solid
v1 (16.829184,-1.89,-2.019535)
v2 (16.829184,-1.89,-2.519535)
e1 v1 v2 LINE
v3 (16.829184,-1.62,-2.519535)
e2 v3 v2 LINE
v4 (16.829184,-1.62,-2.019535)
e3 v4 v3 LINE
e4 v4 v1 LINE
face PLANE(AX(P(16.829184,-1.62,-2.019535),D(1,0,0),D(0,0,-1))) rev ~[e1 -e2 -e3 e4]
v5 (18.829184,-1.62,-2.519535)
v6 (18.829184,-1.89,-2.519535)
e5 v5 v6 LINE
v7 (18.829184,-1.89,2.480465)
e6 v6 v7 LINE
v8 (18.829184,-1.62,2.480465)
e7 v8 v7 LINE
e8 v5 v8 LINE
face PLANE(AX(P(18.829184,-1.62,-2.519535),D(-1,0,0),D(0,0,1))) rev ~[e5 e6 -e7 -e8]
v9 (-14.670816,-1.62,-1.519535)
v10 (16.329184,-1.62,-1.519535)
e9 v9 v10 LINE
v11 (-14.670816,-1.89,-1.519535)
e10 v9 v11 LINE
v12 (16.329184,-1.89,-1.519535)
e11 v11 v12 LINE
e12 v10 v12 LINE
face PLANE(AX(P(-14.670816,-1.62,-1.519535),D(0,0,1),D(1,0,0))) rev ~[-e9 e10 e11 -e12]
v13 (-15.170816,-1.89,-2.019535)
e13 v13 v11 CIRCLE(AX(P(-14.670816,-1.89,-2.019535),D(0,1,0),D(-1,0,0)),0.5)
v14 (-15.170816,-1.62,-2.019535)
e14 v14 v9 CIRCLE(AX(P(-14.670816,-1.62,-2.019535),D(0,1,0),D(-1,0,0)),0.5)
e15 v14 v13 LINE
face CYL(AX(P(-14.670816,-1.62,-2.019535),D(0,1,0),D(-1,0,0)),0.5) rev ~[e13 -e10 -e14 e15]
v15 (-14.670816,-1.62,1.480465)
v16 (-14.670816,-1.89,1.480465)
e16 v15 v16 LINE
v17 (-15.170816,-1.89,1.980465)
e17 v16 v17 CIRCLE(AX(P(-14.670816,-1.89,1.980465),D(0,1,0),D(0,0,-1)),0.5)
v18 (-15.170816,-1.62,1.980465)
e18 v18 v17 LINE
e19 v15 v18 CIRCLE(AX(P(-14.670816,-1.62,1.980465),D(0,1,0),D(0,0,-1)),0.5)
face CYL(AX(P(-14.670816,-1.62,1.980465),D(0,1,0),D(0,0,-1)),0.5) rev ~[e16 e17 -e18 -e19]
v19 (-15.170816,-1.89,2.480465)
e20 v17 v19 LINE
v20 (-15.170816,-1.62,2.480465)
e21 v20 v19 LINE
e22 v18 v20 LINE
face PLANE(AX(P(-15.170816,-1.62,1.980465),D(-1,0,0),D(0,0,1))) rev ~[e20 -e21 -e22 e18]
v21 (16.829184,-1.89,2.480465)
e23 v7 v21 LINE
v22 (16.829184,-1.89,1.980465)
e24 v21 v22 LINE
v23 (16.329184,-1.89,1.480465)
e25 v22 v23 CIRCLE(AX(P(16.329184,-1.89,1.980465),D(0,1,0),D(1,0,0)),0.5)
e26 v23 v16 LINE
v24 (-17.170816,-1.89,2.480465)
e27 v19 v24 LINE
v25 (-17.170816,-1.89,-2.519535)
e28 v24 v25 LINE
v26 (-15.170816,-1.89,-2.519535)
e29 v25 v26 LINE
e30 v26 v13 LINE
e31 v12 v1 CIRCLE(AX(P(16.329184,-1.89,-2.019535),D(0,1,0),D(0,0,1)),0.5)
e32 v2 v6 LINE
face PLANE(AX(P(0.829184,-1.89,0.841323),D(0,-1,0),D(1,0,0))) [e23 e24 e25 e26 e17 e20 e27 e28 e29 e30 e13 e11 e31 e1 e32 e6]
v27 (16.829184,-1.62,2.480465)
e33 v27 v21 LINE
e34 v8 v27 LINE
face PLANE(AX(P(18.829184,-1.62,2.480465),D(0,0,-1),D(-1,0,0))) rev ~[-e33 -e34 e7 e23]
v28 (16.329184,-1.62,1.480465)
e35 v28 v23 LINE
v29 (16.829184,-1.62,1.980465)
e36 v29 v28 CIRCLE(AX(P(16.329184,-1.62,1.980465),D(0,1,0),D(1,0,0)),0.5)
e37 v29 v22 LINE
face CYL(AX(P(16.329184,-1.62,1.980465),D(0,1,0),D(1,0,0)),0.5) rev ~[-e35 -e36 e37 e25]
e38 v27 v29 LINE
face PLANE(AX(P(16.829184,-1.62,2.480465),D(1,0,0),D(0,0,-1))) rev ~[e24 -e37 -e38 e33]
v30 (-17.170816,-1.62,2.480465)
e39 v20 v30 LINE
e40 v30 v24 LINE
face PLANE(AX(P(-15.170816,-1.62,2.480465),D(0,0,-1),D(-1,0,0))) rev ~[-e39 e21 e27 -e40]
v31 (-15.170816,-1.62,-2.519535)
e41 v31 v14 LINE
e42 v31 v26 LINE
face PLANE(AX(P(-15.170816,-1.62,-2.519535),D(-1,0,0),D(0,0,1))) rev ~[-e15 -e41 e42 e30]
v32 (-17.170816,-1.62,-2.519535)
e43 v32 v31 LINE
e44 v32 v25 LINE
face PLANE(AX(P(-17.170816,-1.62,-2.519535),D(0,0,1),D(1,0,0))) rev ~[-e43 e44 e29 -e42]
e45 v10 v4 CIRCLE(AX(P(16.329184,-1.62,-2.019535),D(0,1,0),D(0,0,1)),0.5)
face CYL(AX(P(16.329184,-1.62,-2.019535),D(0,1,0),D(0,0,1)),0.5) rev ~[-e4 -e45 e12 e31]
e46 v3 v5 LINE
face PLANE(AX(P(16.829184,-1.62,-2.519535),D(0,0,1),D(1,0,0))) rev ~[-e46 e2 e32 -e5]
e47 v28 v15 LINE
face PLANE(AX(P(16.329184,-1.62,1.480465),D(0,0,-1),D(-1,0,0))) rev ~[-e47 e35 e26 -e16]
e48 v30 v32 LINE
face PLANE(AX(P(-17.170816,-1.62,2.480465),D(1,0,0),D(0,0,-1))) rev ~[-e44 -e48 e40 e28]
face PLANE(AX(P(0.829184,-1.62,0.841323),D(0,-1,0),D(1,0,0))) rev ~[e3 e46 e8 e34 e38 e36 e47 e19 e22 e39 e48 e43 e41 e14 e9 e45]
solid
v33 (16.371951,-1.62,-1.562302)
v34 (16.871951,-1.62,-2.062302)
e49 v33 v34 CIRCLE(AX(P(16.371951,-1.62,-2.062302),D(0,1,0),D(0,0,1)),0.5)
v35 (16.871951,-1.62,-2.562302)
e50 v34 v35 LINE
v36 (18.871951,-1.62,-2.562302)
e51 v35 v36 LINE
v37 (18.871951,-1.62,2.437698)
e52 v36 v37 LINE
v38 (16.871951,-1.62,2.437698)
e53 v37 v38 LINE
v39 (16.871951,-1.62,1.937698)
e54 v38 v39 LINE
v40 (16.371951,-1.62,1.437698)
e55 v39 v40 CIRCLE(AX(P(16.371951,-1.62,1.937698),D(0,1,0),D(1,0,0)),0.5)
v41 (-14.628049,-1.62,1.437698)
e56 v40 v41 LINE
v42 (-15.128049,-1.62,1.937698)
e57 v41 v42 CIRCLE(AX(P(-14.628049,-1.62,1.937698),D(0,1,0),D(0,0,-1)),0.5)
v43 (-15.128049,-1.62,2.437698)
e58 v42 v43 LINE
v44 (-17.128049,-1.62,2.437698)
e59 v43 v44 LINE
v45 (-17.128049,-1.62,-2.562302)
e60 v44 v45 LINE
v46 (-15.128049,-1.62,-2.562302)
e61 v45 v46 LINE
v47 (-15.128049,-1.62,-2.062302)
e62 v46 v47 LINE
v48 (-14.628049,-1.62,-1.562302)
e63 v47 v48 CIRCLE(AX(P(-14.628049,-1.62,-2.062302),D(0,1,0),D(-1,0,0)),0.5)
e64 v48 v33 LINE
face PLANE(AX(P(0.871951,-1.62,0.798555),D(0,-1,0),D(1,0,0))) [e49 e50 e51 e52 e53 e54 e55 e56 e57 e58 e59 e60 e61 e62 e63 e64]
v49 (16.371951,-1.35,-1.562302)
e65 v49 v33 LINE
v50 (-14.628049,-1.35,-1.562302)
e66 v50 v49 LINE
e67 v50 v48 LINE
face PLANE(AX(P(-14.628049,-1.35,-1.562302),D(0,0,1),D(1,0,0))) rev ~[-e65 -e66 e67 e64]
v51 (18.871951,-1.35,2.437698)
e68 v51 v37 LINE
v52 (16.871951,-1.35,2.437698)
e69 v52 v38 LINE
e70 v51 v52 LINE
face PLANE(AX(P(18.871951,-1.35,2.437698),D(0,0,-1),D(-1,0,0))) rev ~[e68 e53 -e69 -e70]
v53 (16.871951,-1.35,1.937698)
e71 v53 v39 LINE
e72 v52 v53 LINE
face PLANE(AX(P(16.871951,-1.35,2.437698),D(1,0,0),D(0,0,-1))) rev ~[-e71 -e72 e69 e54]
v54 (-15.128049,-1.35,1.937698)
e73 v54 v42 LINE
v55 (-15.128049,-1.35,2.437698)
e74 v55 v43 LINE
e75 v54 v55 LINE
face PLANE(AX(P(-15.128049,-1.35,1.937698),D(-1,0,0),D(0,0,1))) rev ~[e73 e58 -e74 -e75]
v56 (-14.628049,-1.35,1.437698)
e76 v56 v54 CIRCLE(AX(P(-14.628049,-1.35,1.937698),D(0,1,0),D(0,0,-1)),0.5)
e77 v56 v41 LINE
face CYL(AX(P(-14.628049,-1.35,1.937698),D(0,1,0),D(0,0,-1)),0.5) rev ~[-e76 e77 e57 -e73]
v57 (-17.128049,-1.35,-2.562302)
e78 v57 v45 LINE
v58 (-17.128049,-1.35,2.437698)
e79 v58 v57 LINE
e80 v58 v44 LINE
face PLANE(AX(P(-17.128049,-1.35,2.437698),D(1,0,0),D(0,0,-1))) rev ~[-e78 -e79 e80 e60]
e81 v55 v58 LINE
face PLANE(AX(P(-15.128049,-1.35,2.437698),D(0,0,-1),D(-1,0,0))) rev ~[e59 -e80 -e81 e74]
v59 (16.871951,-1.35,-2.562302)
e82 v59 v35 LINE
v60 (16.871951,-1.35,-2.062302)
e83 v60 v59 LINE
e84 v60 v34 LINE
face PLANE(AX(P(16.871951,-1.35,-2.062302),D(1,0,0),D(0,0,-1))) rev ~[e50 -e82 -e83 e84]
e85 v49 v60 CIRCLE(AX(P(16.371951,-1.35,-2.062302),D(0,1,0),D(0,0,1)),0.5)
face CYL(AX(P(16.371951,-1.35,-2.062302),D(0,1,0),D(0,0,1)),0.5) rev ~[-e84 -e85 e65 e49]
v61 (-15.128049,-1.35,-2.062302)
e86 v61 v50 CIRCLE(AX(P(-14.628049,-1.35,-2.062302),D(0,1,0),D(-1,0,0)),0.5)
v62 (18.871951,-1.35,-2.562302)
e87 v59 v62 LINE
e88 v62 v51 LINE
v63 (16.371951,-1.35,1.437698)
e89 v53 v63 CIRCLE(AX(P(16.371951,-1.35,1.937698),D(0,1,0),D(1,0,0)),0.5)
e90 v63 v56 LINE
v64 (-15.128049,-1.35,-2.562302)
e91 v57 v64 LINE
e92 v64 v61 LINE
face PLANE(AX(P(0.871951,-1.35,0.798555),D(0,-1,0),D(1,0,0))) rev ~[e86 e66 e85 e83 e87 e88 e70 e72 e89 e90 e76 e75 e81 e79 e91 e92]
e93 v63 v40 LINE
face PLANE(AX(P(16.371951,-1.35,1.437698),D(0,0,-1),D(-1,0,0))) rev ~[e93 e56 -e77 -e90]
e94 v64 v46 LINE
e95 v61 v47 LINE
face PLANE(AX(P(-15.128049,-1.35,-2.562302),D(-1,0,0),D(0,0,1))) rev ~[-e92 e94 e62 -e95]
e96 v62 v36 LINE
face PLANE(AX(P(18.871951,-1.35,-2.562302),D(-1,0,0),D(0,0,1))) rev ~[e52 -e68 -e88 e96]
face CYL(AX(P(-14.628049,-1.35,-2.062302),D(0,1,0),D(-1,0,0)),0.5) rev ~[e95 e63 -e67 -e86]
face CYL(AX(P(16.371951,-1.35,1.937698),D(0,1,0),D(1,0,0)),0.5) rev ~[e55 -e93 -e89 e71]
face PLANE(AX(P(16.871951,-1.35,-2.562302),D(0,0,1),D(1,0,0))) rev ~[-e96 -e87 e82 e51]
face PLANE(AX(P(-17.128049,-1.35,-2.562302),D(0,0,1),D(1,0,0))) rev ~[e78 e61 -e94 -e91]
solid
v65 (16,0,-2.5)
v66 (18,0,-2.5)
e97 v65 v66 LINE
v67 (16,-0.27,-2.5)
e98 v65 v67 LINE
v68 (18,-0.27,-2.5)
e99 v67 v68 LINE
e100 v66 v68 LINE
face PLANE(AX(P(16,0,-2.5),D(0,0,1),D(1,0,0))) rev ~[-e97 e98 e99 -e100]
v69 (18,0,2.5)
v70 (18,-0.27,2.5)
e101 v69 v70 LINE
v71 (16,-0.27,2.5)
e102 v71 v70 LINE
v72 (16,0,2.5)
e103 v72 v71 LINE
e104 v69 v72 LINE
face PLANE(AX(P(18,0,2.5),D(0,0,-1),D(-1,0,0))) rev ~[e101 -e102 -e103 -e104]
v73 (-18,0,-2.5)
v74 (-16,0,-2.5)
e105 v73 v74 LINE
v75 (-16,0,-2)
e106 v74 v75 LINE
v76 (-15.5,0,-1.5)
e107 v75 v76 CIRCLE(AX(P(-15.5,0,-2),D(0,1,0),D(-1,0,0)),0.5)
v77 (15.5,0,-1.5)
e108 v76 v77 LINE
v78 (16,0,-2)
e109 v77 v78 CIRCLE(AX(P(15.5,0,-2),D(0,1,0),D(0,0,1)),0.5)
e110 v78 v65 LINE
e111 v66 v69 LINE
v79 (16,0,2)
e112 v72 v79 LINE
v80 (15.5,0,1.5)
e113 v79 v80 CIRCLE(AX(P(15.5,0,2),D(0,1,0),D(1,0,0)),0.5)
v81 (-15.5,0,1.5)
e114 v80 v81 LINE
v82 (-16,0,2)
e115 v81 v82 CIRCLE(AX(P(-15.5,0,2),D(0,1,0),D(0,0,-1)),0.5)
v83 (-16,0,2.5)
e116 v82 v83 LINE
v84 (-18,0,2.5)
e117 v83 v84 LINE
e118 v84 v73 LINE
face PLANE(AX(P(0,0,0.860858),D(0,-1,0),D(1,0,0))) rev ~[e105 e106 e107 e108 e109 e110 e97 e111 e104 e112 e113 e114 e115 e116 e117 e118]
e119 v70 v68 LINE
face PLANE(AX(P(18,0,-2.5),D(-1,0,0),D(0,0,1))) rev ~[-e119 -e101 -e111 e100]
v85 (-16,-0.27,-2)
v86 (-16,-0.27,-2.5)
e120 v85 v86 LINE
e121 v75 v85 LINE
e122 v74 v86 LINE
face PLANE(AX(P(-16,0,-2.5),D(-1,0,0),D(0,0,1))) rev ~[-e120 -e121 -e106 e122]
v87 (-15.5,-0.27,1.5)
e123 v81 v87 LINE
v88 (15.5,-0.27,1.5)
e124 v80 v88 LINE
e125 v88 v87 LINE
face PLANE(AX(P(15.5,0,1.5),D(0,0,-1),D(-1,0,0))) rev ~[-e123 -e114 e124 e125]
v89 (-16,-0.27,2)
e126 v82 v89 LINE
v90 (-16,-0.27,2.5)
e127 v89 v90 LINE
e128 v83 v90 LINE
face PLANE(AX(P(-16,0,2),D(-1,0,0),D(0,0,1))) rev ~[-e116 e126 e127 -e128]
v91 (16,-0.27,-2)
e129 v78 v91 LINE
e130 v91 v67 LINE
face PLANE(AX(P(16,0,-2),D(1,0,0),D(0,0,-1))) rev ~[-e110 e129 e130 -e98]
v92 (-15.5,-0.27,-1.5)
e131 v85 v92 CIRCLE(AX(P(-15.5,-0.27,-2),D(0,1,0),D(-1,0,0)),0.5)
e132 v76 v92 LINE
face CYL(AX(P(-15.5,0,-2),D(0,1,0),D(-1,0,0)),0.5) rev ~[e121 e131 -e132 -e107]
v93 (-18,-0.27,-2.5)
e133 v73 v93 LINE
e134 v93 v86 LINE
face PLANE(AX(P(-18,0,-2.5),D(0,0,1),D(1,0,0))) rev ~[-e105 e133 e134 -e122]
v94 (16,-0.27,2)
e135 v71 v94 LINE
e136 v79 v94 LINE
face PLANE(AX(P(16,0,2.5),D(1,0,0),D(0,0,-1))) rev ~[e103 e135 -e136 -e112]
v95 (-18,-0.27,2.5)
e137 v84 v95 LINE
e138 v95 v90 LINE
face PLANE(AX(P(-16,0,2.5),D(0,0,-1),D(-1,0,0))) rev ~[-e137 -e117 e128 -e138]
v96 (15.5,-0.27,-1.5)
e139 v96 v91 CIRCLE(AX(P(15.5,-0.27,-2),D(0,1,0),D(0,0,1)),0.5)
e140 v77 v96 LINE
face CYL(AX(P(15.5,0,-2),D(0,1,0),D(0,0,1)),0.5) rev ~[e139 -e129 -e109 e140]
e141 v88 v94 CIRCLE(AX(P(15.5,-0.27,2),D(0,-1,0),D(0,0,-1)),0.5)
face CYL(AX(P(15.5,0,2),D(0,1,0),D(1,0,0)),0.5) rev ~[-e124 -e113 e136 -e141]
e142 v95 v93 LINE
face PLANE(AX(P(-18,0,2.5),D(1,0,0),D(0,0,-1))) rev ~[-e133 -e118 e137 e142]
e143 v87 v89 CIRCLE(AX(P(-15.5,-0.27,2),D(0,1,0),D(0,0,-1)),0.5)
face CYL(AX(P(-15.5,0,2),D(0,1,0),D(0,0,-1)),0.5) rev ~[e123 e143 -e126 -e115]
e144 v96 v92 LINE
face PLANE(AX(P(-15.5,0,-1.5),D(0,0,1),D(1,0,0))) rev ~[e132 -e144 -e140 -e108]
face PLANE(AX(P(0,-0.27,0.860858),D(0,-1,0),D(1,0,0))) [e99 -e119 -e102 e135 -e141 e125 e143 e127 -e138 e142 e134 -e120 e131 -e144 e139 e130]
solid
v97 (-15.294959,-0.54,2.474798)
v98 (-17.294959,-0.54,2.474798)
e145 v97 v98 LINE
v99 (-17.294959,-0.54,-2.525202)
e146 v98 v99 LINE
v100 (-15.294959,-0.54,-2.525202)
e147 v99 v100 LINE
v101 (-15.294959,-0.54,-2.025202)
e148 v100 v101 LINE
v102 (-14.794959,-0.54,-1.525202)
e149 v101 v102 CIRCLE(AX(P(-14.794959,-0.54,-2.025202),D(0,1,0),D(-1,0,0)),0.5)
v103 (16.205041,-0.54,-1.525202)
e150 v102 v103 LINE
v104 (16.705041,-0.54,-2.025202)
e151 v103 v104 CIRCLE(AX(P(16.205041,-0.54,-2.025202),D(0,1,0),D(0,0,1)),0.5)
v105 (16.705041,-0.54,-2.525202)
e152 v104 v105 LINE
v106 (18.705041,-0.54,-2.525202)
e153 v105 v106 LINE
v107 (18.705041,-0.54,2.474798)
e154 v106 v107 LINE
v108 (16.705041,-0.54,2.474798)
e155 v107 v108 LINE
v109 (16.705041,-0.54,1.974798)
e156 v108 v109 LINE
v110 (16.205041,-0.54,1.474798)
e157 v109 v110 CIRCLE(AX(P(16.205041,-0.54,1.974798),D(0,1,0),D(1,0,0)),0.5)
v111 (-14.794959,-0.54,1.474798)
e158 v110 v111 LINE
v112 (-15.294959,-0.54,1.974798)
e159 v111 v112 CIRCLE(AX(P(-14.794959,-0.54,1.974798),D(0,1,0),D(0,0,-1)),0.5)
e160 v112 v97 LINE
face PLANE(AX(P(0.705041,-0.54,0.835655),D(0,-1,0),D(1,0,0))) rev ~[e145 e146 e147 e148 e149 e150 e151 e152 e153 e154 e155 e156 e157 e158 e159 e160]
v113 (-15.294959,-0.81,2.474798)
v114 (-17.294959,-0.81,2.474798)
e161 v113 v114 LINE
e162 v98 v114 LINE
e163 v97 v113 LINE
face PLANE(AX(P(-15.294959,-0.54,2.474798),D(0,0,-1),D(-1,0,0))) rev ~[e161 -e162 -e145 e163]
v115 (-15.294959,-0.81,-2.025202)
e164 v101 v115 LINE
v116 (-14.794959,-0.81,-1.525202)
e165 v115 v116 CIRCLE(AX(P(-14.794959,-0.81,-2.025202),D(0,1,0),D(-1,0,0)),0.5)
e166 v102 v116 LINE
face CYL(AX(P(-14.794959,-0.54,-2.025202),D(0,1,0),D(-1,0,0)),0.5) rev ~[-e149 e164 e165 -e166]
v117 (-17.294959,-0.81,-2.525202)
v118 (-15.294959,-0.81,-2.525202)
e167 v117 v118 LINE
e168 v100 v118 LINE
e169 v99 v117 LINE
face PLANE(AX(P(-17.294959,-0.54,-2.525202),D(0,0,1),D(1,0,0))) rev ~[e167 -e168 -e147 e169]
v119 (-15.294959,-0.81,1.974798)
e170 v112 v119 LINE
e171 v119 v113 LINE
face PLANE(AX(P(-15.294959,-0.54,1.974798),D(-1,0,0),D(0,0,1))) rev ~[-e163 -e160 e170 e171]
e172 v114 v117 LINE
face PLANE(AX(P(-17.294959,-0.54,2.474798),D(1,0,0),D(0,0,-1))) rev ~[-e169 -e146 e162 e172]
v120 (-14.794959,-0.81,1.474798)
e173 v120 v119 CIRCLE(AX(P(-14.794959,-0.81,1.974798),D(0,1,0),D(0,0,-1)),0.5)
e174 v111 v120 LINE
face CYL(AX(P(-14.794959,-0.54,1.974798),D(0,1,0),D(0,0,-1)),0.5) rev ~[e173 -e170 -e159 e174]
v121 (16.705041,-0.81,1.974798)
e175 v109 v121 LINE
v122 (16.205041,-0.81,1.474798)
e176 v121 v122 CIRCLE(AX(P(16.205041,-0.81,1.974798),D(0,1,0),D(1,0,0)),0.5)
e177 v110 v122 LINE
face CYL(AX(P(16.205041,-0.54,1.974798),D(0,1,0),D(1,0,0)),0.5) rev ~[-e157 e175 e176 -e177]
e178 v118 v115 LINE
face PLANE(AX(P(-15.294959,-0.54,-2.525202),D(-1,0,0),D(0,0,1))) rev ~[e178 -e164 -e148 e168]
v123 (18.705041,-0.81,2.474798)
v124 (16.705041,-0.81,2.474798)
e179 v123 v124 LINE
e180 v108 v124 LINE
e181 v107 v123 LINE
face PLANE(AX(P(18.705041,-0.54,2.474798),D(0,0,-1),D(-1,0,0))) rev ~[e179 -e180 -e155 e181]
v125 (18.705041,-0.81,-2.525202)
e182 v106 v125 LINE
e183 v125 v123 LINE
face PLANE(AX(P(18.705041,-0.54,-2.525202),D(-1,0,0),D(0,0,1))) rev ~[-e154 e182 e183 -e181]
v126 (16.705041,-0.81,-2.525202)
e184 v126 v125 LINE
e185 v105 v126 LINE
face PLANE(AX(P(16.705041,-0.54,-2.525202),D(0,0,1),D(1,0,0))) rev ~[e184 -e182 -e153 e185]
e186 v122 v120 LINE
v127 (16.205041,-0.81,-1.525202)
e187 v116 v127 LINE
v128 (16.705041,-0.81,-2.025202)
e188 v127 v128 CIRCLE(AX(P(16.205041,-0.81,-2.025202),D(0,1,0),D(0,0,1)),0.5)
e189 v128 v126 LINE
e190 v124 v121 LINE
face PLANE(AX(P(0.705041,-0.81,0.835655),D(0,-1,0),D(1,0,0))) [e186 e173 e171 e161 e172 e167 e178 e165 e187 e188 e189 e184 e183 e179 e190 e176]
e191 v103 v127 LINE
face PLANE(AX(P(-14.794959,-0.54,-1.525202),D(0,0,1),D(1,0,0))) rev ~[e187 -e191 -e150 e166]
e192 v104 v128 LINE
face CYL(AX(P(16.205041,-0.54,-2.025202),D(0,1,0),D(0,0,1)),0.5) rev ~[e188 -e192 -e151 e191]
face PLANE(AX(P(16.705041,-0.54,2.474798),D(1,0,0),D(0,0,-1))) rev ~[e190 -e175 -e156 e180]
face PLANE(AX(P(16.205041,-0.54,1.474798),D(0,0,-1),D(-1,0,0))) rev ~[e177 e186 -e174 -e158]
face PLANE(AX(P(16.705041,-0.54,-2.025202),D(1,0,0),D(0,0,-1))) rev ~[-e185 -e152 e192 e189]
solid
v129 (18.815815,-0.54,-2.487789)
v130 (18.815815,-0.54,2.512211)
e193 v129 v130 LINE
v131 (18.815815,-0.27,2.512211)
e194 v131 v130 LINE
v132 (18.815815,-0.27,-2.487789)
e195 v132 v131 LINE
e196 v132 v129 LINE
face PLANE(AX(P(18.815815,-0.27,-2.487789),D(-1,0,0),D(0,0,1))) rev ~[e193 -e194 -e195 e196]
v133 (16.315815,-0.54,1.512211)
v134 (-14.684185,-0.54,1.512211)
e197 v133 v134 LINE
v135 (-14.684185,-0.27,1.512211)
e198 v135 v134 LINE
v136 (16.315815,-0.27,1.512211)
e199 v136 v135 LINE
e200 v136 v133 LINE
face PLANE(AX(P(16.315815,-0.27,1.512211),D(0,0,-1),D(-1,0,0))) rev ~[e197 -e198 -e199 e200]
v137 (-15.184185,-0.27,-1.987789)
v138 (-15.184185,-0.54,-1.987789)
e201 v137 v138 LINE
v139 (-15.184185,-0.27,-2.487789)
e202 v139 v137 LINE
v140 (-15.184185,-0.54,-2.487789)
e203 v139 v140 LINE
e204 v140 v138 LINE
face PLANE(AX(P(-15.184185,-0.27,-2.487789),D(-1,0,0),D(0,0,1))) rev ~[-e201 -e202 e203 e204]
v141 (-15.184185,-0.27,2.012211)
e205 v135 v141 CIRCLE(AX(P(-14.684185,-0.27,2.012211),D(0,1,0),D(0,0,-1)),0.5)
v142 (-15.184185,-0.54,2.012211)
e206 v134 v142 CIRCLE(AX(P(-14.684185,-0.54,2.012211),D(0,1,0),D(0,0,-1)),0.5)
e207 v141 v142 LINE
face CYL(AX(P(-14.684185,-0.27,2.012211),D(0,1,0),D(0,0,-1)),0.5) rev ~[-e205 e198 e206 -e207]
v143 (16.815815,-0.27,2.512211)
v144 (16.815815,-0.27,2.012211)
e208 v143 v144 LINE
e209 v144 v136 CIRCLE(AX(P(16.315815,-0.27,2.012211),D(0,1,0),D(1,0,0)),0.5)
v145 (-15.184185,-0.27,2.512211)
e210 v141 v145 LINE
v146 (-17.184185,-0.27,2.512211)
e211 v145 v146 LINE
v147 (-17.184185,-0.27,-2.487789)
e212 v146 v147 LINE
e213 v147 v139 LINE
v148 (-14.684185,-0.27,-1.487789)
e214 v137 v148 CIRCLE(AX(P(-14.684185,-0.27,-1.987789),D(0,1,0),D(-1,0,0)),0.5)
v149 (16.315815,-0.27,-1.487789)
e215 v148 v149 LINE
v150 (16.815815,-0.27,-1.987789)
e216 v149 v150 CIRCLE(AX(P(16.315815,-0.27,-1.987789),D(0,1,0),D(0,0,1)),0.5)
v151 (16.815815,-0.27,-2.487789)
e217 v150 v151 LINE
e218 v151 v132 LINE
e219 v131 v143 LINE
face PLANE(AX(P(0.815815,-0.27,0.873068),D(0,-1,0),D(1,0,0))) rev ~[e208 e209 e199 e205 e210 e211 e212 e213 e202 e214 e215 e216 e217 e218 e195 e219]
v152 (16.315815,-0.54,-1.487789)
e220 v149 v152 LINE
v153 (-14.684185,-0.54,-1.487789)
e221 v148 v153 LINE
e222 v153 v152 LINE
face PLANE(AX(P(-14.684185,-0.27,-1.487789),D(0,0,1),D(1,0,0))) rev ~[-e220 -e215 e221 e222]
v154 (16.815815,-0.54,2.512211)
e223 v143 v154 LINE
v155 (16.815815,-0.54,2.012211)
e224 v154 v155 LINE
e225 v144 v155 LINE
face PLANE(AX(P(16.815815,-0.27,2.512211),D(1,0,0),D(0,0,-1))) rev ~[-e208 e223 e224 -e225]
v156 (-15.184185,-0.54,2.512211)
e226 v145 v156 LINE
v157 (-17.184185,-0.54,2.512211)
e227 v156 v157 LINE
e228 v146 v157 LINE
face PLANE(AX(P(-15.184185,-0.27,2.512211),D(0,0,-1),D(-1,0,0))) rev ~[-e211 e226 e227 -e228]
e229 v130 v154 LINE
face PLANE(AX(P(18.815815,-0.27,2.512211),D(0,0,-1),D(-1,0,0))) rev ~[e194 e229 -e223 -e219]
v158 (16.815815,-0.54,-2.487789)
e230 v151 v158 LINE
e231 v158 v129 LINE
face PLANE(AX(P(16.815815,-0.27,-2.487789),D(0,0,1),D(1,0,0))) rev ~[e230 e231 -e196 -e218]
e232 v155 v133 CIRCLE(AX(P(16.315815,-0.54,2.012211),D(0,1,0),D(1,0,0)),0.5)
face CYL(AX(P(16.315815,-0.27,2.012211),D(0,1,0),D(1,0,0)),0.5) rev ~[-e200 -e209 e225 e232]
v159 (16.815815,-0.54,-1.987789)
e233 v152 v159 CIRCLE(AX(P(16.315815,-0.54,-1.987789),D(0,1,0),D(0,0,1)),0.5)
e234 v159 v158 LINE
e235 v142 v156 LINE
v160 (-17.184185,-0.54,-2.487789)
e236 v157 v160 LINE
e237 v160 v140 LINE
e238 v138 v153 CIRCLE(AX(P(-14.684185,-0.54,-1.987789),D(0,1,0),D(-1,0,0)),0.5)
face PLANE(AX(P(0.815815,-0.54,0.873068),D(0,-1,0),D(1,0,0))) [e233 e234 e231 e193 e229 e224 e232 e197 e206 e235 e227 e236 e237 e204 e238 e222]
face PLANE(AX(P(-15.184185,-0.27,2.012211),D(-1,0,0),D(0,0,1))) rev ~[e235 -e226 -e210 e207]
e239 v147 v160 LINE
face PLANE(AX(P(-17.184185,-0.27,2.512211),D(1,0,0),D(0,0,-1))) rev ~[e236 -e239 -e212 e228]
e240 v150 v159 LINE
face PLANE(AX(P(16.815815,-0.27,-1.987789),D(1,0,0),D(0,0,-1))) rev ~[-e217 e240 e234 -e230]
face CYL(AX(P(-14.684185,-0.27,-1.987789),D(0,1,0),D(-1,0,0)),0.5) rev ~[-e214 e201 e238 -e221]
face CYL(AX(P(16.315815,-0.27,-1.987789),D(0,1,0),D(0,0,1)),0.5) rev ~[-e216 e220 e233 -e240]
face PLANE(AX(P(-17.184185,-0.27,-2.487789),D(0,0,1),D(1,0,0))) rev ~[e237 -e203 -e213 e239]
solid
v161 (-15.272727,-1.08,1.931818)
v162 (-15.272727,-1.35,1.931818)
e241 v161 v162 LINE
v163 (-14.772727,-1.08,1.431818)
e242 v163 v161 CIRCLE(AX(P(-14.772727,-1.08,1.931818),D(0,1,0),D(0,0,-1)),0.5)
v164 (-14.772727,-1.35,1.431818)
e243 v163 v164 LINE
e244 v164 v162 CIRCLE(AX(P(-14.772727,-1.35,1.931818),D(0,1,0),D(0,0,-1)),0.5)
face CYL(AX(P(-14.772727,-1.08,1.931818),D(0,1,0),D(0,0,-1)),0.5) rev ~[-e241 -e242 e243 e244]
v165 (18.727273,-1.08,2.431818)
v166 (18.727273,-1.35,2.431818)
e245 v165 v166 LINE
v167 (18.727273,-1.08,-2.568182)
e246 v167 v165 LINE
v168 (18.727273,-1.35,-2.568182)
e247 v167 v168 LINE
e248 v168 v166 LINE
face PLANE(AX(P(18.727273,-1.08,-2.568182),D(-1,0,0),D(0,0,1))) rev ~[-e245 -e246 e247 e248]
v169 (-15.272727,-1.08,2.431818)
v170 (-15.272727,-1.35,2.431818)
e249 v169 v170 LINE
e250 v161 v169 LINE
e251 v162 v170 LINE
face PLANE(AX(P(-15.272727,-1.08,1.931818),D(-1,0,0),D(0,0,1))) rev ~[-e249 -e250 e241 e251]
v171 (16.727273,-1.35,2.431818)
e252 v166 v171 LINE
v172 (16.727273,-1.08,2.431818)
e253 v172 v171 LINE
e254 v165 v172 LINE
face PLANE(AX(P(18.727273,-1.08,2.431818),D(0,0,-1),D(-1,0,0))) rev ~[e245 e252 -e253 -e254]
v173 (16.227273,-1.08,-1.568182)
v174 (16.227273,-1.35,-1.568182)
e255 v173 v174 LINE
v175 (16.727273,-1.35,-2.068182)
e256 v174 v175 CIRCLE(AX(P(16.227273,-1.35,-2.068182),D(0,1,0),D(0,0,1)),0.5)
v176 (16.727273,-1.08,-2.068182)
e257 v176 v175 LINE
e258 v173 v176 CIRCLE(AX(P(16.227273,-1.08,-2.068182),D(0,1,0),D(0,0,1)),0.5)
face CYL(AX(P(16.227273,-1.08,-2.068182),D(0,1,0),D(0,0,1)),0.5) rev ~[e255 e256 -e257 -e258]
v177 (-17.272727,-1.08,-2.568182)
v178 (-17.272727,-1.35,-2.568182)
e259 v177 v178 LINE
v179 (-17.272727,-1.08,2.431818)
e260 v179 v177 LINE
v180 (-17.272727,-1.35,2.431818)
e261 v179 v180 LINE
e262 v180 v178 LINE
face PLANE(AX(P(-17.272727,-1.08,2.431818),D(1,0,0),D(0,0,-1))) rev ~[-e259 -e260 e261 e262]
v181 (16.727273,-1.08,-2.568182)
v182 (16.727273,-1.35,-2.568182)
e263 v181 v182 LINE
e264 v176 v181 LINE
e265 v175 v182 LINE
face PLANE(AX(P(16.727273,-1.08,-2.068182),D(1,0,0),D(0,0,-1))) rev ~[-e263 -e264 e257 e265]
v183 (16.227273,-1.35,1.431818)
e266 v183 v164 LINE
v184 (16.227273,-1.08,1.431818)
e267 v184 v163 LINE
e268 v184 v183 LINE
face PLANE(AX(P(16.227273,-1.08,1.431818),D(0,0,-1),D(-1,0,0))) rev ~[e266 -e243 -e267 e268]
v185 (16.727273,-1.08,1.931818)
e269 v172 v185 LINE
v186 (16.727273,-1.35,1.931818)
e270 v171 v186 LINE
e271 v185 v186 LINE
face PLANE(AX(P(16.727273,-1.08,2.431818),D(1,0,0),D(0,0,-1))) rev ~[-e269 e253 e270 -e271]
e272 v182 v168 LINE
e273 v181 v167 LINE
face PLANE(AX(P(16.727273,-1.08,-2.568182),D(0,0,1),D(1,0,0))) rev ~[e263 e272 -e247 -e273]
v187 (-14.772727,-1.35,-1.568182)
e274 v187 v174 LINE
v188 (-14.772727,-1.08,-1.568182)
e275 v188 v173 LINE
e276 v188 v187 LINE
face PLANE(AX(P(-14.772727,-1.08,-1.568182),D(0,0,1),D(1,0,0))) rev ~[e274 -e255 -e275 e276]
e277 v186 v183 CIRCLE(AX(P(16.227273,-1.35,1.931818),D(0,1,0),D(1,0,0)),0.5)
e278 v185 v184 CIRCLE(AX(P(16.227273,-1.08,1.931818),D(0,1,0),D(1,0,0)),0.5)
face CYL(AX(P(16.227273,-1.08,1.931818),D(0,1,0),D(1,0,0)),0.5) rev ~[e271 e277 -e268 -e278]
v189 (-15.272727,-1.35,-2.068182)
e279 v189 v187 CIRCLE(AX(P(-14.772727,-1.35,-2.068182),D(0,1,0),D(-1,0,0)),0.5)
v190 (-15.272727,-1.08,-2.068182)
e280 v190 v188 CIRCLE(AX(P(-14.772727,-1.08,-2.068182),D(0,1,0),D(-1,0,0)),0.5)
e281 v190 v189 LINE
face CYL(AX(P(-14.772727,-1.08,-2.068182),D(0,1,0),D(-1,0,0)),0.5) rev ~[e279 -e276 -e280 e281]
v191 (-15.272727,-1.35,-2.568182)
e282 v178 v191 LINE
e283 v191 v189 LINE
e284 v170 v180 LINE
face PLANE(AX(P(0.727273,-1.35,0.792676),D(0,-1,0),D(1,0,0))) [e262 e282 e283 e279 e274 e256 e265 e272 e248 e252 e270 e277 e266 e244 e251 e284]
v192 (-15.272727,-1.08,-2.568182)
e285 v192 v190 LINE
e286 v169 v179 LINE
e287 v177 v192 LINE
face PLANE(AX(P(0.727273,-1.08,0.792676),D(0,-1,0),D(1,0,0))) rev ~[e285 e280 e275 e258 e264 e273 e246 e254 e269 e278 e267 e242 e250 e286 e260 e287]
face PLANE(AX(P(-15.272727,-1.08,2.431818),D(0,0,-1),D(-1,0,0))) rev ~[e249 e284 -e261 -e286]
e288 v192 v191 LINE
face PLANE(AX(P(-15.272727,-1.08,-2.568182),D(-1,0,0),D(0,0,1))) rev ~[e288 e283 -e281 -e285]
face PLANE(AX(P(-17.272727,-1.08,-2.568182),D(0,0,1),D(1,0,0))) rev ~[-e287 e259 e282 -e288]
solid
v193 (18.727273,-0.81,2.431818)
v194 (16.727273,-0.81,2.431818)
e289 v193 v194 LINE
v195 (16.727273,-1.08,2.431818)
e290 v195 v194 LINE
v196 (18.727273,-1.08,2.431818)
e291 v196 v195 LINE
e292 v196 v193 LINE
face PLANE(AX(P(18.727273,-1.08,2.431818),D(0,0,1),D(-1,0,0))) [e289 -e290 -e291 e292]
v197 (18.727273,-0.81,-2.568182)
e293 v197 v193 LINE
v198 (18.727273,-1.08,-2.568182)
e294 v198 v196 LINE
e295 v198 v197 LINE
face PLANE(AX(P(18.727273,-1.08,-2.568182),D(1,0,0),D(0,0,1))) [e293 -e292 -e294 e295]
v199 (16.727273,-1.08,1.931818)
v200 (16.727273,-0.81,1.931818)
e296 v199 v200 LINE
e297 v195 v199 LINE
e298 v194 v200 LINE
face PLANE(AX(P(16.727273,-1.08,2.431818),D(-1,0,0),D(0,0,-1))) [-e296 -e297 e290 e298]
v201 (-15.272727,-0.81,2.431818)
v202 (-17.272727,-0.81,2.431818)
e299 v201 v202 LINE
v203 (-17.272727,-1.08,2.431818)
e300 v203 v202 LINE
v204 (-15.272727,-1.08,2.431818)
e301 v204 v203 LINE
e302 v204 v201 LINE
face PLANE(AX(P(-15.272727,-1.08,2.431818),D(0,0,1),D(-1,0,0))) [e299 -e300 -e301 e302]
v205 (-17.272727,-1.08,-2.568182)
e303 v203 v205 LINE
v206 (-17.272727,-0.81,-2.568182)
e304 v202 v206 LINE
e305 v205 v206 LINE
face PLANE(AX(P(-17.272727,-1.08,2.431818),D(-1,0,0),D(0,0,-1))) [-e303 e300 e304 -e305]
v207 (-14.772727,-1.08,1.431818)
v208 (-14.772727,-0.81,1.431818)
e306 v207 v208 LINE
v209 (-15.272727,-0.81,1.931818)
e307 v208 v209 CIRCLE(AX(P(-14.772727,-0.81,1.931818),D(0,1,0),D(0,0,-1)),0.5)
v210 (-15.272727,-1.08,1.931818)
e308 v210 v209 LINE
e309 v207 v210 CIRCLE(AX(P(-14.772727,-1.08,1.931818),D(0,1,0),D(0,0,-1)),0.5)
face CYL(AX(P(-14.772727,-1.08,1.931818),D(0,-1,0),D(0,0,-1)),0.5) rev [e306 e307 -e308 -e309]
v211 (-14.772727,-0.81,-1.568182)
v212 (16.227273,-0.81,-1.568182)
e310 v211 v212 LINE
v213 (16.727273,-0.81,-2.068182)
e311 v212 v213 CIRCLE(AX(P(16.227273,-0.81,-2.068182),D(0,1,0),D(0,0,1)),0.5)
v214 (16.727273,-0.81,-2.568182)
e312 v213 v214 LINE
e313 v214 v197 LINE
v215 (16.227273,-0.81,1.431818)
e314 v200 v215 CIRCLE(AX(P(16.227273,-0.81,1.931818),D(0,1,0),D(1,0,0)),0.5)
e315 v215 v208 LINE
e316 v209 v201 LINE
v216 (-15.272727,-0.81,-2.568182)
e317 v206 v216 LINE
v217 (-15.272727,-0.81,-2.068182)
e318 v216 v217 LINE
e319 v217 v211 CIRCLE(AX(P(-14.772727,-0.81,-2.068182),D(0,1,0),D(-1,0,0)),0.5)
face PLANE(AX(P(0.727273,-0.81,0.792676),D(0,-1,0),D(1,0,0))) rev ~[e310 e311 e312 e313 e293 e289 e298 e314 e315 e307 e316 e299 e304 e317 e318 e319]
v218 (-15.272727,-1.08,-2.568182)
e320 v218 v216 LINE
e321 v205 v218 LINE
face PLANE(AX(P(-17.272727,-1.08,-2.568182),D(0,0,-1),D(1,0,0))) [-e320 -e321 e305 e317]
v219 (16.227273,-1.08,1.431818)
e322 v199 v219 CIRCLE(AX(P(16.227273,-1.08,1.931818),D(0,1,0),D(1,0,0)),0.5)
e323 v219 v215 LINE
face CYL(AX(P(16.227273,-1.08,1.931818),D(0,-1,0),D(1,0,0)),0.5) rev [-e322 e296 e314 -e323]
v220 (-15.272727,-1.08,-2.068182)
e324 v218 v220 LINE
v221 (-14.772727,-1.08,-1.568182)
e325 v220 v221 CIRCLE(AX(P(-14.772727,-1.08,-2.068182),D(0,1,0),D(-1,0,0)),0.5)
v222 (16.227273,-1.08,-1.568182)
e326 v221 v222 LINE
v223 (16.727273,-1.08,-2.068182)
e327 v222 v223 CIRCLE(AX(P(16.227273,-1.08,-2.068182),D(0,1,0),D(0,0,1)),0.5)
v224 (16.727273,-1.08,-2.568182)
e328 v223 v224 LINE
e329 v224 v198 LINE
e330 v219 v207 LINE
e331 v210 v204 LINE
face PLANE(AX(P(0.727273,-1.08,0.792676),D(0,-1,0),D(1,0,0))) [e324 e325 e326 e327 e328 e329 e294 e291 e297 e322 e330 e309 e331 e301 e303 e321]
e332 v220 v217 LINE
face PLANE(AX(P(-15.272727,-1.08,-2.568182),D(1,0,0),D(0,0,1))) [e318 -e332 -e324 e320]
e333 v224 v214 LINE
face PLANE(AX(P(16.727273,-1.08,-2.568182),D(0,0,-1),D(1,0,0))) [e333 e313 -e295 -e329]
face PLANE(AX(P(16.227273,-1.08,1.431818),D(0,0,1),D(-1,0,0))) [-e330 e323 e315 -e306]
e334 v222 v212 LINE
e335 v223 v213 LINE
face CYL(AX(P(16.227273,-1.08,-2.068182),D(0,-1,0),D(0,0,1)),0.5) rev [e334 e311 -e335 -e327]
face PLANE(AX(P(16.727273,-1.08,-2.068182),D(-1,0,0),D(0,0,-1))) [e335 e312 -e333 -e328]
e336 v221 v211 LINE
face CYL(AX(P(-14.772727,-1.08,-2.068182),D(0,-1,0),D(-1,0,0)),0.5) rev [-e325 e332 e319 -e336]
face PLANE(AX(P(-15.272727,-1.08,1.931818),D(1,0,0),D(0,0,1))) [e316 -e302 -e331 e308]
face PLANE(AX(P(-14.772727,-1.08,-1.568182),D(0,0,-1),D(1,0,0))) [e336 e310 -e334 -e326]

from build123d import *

# Parameters (mm, degrees)
F1_DEPTH  = 0.27
F4_DEPTH  = 0.27
F7_DEPTH  = 0.27
F10_DEPTH = 0.27
F13_DEPTH = 0.27
F14_DEPTH = 0.27
F15_DEPTH = 0.27
F18_DEPTH = 0.27
F21_DEPTH = 0.27


with BuildPart() as f1:
    # F0 (on Front) → F1 (new body)
    with BuildSketch(Plane.XZ):
        with BuildLine():
            Line((-16, 2.5), (-18, 2.5))
            Line((-18, 2.5), (-18, 0))
            Line((-18, 0), (18, 0))
            Line((18, 0), (18, 2.5))
            Line((18, 2.5), (16, 2.5))
            Line((16, 2.5), (16, 2))
            ThreePointArc((16, 2), (15.8535533906, 1.6464466094), (15.5, 1.5))
            Line((15.5, 1.5), (0, 1.5))
            Line((0, 1.5), (-15.5, 1.5))
            ThreePointArc((-15.5, 1.5), (-15.8535533906, 1.6464466094), (-16, 2))
            Line((-16, 2), (-16, 2.5))
        make_face()
        with BuildLine():
            Line((18, 0), (-18, 0))
            Line((-18, 0), (-18, -2.5))
            Line((-18, -2.5), (-16, -2.5))
            Line((-16, -2.5), (-16, -2))
            ThreePointArc((-16, -2), (-15.8535533906, -1.6464466094), (-15.5, -1.5))
            Line((-15.5, -1.5), (0, -1.5))
            Line((0, -1.5), (15.5, -1.5))
            ThreePointArc((15.5, -1.5), (15.8535533906, -1.6464466094), (16, -2))
            Line((16, -2), (16, -2.5))
            Line((16, -2.5), (18, -2.5))
            Line((18, -2.5), (18, 0))
        make_face()
    extrude(amount=F1_DEPTH)

    # F3 (on offset) → F4 (cut)
    with BuildSketch(Plane.XZ.offset(0.27)):
        with BuildLine():
            Line((-15.1841846166, 2.5122108632), (-17.1841846166, 2.5122108632))
            Line((-17.1841846166, 2.5122108632), (-17.1841846166, 0.0122108632))
            Line((-17.1841846166, 0.0122108632), (18.8158153834, 0.0122108632))
            Line((18.8158153834, 0.0122108632), (18.8158153834, 2.5122108632))
            Line((18.8158153834, 2.5122108632), (16.8158153834, 2.5122108632))
            Line((16.8158153834, 2.5122108632), (16.8158153834, 2.0122108632))
            ThreePointArc((16.8158153834, 2.0122108632), (16.669368774, 1.6586574726), (16.3158153834, 1.5122108632))
            Line((16.3158153834, 1.5122108632), (0.8158153834, 1.5122108632))
            Line((0.8158153834, 1.5122108632), (-14.6841846166, 1.5122108632))
            ThreePointArc((-14.6841846166, 1.5122108632), (-15.0377380072, 1.6586574726), (-15.1841846166, 2.0122108632))
            Line((-15.1841846166, 2.0122108632), (-15.1841846166, 2.5122108632))
        make_face()
        with BuildLine():
            Line((18.8158153834, 0.0122108632), (-17.1841846166, 0.0122108632))
            Line((-17.1841846166, 0.0122108632), (-17.1841846166, -2.4877891368))
            Line((-17.1841846166, -2.4877891368), (-15.1841846166, -2.4877891368))
            Line((-15.1841846166, -2.4877891368), (-15.1841846166, -1.9877891368))
            ThreePointArc((-15.1841846166, -1.9877891368), (-15.0377380072, -1.6342357462), (-14.6841846166, -1.4877891368))
            Line((-14.6841846166, -1.4877891368), (0.8158153834, -1.4877891368))
            Line((0.8158153834, -1.4877891368), (16.3158153834, -1.4877891368))
            ThreePointArc((16.3158153834, -1.4877891368), (16.669368774, -1.6342357462), (16.8158153834, -1.9877891368))
            Line((16.8158153834, -1.9877891368), (16.8158153834, -2.4877891368))
            Line((16.8158153834, -2.4877891368), (18.8158153834, -2.4877891368))
            Line((18.8158153834, -2.4877891368), (18.8158153834, 0.0122108632))
        make_face()
    extrude(amount=F4_DEPTH, mode=Mode.SUBTRACT)

    # F9 (on offset) → F10 (cut)
    with BuildSketch(Plane.XZ.offset(0.81)):
        with BuildLine():
            Line((-15.2458471914, 2.4499582283), (-17.2458471914, 2.4499582283))
            Line((-17.2458471914, 2.4499582283), (-17.2458471914, -0.0500417717))
            Line((-17.2458471914, -0.0500417717), (18.7541528086, -0.0500417717))
            Line((18.7541528086, -0.0500417717), (18.7541528086, 2.4499582283))
            Line((18.7541528086, 2.4499582283), (16.7541528086, 2.4499582283))
            Line((16.7541528086, 2.4499582283), (16.7541528086, 1.9499582283))
            ThreePointArc((16.7541528086, 1.9499582283), (16.6077061992, 1.5964048377), (16.2541528086, 1.4499582283))
            Line((16.2541528086, 1.4499582283), (0.7541528086, 1.4499582283))
            Line((0.7541528086, 1.4499582283), (-14.7458471914, 1.4499582283))
            ThreePointArc((-14.7458471914, 1.4499582283), (-15.099400582, 1.5964048377), (-15.2458471914, 1.9499582283))
            Line((-15.2458471914, 1.9499582283), (-15.2458471914, 2.4499582283))
        make_face()
        with BuildLine():
            Line((18.7541528086, -0.0500417717), (-17.2458471914, -0.0500417717))
            Line((-17.2458471914, -0.0500417717), (-17.2458471914, -2.5500417717))
            Line((-17.2458471914, -2.5500417717), (-15.2458471914, -2.5500417717))
            Line((-15.2458471914, -2.5500417717), (-15.2458471914, -2.0500417717))
            ThreePointArc((-15.2458471914, -2.0500417717), (-15.099400582, -1.6964883811), (-14.7458471914, -1.5500417717))
            Line((-14.7458471914, -1.5500417717), (0.7541528086, -1.5500417717))
            Line((0.7541528086, -1.5500417717), (16.2541528086, -1.5500417717))
            ThreePointArc((16.2541528086, -1.5500417717), (16.6077061992, -1.6964883811), (16.7541528086, -2.0500417717))
            Line((16.7541528086, -2.0500417717), (16.7541528086, -2.5500417717))
            Line((16.7541528086, -2.5500417717), (18.7541528086, -2.5500417717))
            Line((18.7541528086, -2.5500417717), (18.7541528086, -0.0500417717))
        make_face()
    extrude(amount=F10_DEPTH, mode=Mode.SUBTRACT)


with BuildPart() as f7:
    # F6 (on offset) → F7 (new body)
    with BuildSketch(Plane.XZ.offset(0.54)):
        with BuildLine():
            Line((-15.2949587338, 2.4747978128), (-17.2949587338, 2.4747978128))
            Line((-17.2949587338, 2.4747978128), (-17.2949587338, -0.0252021872))
            Line((-17.2949587338, -0.0252021872), (18.7050412662, -0.0252021872))
            Line((18.7050412662, -0.0252021872), (18.7050412662, 2.4747978128))
            Line((18.7050412662, 2.4747978128), (16.7050412662, 2.4747978128))
            Line((16.7050412662, 2.4747978128), (16.7050412662, 1.9747978128))
            ThreePointArc((16.7050412662, 1.9747978128), (16.5585946567, 1.6212444222), (16.2050412662, 1.4747978128))
            Line((16.2050412662, 1.4747978128), (0.7050412662, 1.4747978128))
            Line((0.7050412662, 1.4747978128), (-14.7949587338, 1.4747978128))
            ThreePointArc((-14.7949587338, 1.4747978128), (-15.1485121244, 1.6212444222), (-15.2949587338, 1.9747978128))
            Line((-15.2949587338, 1.9747978128), (-15.2949587338, 2.4747978128))
        make_face()
        with BuildLine():
            Line((18.7050412662, -0.0252021872), (-17.2949587338, -0.0252021872))
            Line((-17.2949587338, -0.0252021872), (-17.2949587338, -2.5252021872))
            Line((-17.2949587338, -2.5252021872), (-15.2949587338, -2.5252021872))
            Line((-15.2949587338, -2.5252021872), (-15.2949587338, -2.0252021872))
            ThreePointArc((-15.2949587338, -2.0252021872), (-15.1485121244, -1.6716487966), (-14.7949587338, -1.5252021872))
            Line((-14.7949587338, -1.5252021872), (0.7050412662, -1.5252021872))
            Line((0.7050412662, -1.5252021872), (16.2050412662, -1.5252021872))
            ThreePointArc((16.2050412662, -1.5252021872), (16.5585946567, -1.6716487966), (16.7050412662, -2.0252021872))
            Line((16.7050412662, -2.0252021872), (16.7050412662, -2.5252021872))
            Line((16.7050412662, -2.5252021872), (18.7050412662, -2.5252021872))
            Line((18.7050412662, -2.5252021872), (18.7050412662, -0.0252021872))
        make_face()
    extrude(amount=F7_DEPTH)


with BuildPart() as f13:
    # F12 (on offset) → F13 (new body)
    with BuildSketch(Plane.XZ.offset(1.08)):
        with BuildLine():
            Line((-15.2727272727, 2.4318181818), (-17.2727272727, 2.4318181818))
            Line((-17.2727272727, 2.4318181818), (-17.2727272727, -0.0681818182))
            Line((-17.2727272727, -0.0681818182), (18.7272727273, -0.0681818182))
            Line((18.7272727273, -0.0681818182), (18.7272727273, 2.4318181818))
            Line((18.7272727273, 2.4318181818), (16.7272727273, 2.4318181818))
            Line((16.7272727273, 2.4318181818), (16.7272727273, 1.9318181818))
            ThreePointArc((16.7272727273, 1.9318181818), (16.5808261179, 1.5782647912), (16.2272727273, 1.4318181818))
            Line((16.2272727273, 1.4318181818), (0.7272727273, 1.4318181818))
            Line((0.7272727273, 1.4318181818), (-14.7727272727, 1.4318181818))
            ThreePointArc((-14.7727272727, 1.4318181818), (-15.1262806633, 1.5782647912), (-15.2727272727, 1.9318181818))
            Line((-15.2727272727, 1.9318181818), (-15.2727272727, 2.4318181818))
        make_face()
        with BuildLine():
            Line((18.7272727273, -0.0681818182), (-17.2727272727, -0.0681818182))
            Line((-17.2727272727, -0.0681818182), (-17.2727272727, -2.5681818182))
            Line((-17.2727272727, -2.5681818182), (-15.2727272727, -2.5681818182))
            Line((-15.2727272727, -2.5681818182), (-15.2727272727, -2.0681818182))
            ThreePointArc((-15.2727272727, -2.0681818182), (-15.1262806633, -1.7146284276), (-14.7727272727, -1.5681818182))
            Line((-14.7727272727, -1.5681818182), (0.7272727273, -1.5681818182))
            Line((0.7272727273, -1.5681818182), (16.2272727273, -1.5681818182))
            ThreePointArc((16.2272727273, -1.5681818182), (16.5808261179, -1.7146284276), (16.7272727273, -2.0681818182))
            Line((16.7272727273, -2.0681818182), (16.7272727273, -2.5681818182))
            Line((16.7272727273, -2.5681818182), (18.7272727273, -2.5681818182))
            Line((18.7272727273, -2.5681818182), (18.7272727273, -0.0681818182))
        make_face()
    extrude(amount=F13_DEPTH)


with BuildPart() as f14:
    # F3 (on offset) → F14 (new body)
    with BuildSketch(Plane.XZ.offset(0.27)):
        with BuildLine():
            Line((-15.1841846166, 2.5122108632), (-17.1841846166, 2.5122108632))
            Line((-17.1841846166, 2.5122108632), (-17.1841846166, 0.0122108632))
            Line((-17.1841846166, 0.0122108632), (18.8158153834, 0.0122108632))
            Line((18.8158153834, 0.0122108632), (18.8158153834, 2.5122108632))
            Line((18.8158153834, 2.5122108632), (16.8158153834, 2.5122108632))
            Line((16.8158153834, 2.5122108632), (16.8158153834, 2.0122108632))
            ThreePointArc((16.8158153834, 2.0122108632), (16.669368774, 1.6586574726), (16.3158153834, 1.5122108632))
            Line((16.3158153834, 1.5122108632), (0.8158153834, 1.5122108632))
            Line((0.8158153834, 1.5122108632), (-14.6841846166, 1.5122108632))
            ThreePointArc((-14.6841846166, 1.5122108632), (-15.0377380072, 1.6586574726), (-15.1841846166, 2.0122108632))
            Line((-15.1841846166, 2.0122108632), (-15.1841846166, 2.5122108632))
        make_face()
        with BuildLine():
            Line((18.8158153834, 0.0122108632), (-17.1841846166, 0.0122108632))
            Line((-17.1841846166, 0.0122108632), (-17.1841846166, -2.4877891368))
            Line((-17.1841846166, -2.4877891368), (-15.1841846166, -2.4877891368))
            Line((-15.1841846166, -2.4877891368), (-15.1841846166, -1.9877891368))
            ThreePointArc((-15.1841846166, -1.9877891368), (-15.0377380072, -1.6342357462), (-14.6841846166, -1.4877891368))
            Line((-14.6841846166, -1.4877891368), (0.8158153834, -1.4877891368))
            Line((0.8158153834, -1.4877891368), (16.3158153834, -1.4877891368))
            ThreePointArc((16.3158153834, -1.4877891368), (16.669368774, -1.6342357462), (16.8158153834, -1.9877891368))
            Line((16.8158153834, -1.9877891368), (16.8158153834, -2.4877891368))
            Line((16.8158153834, -2.4877891368), (18.8158153834, -2.4877891368))
            Line((18.8158153834, -2.4877891368), (18.8158153834, 0.0122108632))
        make_face()
    extrude(amount=F14_DEPTH)


with BuildPart() as f15:
    # F12 (on offset) → F15 (new body)
    with BuildSketch(Plane.XZ.offset(1.08)):
        with BuildLine():
            Line((-15.2727272727, 2.4318181818), (-17.2727272727, 2.4318181818))
            Line((-17.2727272727, 2.4318181818), (-17.2727272727, -0.0681818182))
            Line((-17.2727272727, -0.0681818182), (18.7272727273, -0.0681818182))
            Line((18.7272727273, -0.0681818182), (18.7272727273, 2.4318181818))
            Line((18.7272727273, 2.4318181818), (16.7272727273, 2.4318181818))
            Line((16.7272727273, 2.4318181818), (16.7272727273, 1.9318181818))
            ThreePointArc((16.7272727273, 1.9318181818), (16.5808261179, 1.5782647912), (16.2272727273, 1.4318181818))
            Line((16.2272727273, 1.4318181818), (0.7272727273, 1.4318181818))
            Line((0.7272727273, 1.4318181818), (-14.7727272727, 1.4318181818))
            ThreePointArc((-14.7727272727, 1.4318181818), (-15.1262806633, 1.5782647912), (-15.2727272727, 1.9318181818))
            Line((-15.2727272727, 1.9318181818), (-15.2727272727, 2.4318181818))
        make_face()
        with BuildLine():
            Line((18.7272727273, -0.0681818182), (-17.2727272727, -0.0681818182))
            Line((-17.2727272727, -0.0681818182), (-17.2727272727, -2.5681818182))
            Line((-17.2727272727, -2.5681818182), (-15.2727272727, -2.5681818182))
            Line((-15.2727272727, -2.5681818182), (-15.2727272727, -2.0681818182))
            ThreePointArc((-15.2727272727, -2.0681818182), (-15.1262806633, -1.7146284276), (-14.7727272727, -1.5681818182))
            Line((-14.7727272727, -1.5681818182), (0.7272727273, -1.5681818182))
            Line((0.7272727273, -1.5681818182), (16.2272727273, -1.5681818182))
            ThreePointArc((16.2272727273, -1.5681818182), (16.5808261179, -1.7146284276), (16.7272727273, -2.0681818182))
            Line((16.7272727273, -2.0681818182), (16.7272727273, -2.5681818182))
            Line((16.7272727273, -2.5681818182), (18.7272727273, -2.5681818182))
            Line((18.7272727273, -2.5681818182), (18.7272727273, -0.0681818182))
        make_face()
    extrude(amount=-F15_DEPTH)


with BuildPart() as f18:
    # F17 (on offset) → F18 (new body)
    with BuildSketch(Plane.XZ.offset(1.35)):
        with BuildLine():
            Line((-15.1280487846, 2.4376975121), (-17.1280487846, 2.4376975121))
            Line((-17.1280487846, 2.4376975121), (-17.1280487846, -0.0623024879))
            Line((-17.1280487846, -0.0623024879), (18.8719512154, -0.0623024879))
            Line((18.8719512154, -0.0623024879), (18.8719512154, 2.4376975121))
            Line((18.8719512154, 2.4376975121), (16.8719512154, 2.4376975121))
            Line((16.8719512154, 2.4376975121), (16.8719512154, 1.9376975121))
            ThreePointArc((16.8719512154, 1.9376975121), (16.725504606, 1.5841441215), (16.3719512154, 1.4376975121))
            Line((16.3719512154, 1.4376975121), (0.8719512154, 1.4376975121))
            Line((0.8719512154, 1.4376975121), (-14.6280487846, 1.4376975121))
            ThreePointArc((-14.6280487846, 1.4376975121), (-14.9816021752, 1.5841441215), (-15.1280487846, 1.9376975121))
            Line((-15.1280487846, 1.9376975121), (-15.1280487846, 2.4376975121))
        make_face()
        with BuildLine():
            Line((18.8719512154, -0.0623024879), (-17.1280487846, -0.0623024879))
            Line((-17.1280487846, -0.0623024879), (-17.1280487846, -2.5623024879))
            Line((-17.1280487846, -2.5623024879), (-15.1280487846, -2.5623024879))
            Line((-15.1280487846, -2.5623024879), (-15.1280487846, -2.0623024879))
            ThreePointArc((-15.1280487846, -2.0623024879), (-14.9816021752, -1.7087490973), (-14.6280487846, -1.5623024879))
            Line((-14.6280487846, -1.5623024879), (0.8719512154, -1.5623024879))
            Line((0.8719512154, -1.5623024879), (16.3719512154, -1.5623024879))
            ThreePointArc((16.3719512154, -1.5623024879), (16.725504606, -1.7087490973), (16.8719512154, -2.0623024879))
            Line((16.8719512154, -2.0623024879), (16.8719512154, -2.5623024879))
            Line((16.8719512154, -2.5623024879), (18.8719512154, -2.5623024879))
            Line((18.8719512154, -2.5623024879), (18.8719512154, -0.0623024879))
        make_face()
    extrude(amount=F18_DEPTH)


with BuildPart() as f21:
    # F20 (on offset) → F21 (new body)
    with BuildSketch(Plane.XZ.offset(1.62)):
        with BuildLine():
            Line((-15.1708155028, 2.4804651617), (-17.1708155028, 2.4804651617))
            Line((-17.1708155028, 2.4804651617), (-17.1708155028, -0.0195348383))
            Line((-17.1708155028, -0.0195348383), (18.8291844972, -0.0195348383))
            Line((18.8291844972, -0.0195348383), (18.8291844972, 2.4804651617))
            Line((18.8291844972, 2.4804651617), (16.8291844972, 2.4804651617))
            Line((16.8291844972, 2.4804651617), (16.8291844972, 1.9804651617))
            ThreePointArc((16.8291844972, 1.9804651617), (16.6827378878, 1.6269117711), (16.3291844972, 1.4804651617))
            Line((16.3291844972, 1.4804651617), (0.8291844972, 1.4804651617))
            Line((0.8291844972, 1.4804651617), (-14.6708155028, 1.4804651617))
            ThreePointArc((-14.6708155028, 1.4804651617), (-15.0243688934, 1.6269117711), (-15.1708155028, 1.9804651617))
            Line((-15.1708155028, 1.9804651617), (-15.1708155028, 2.4804651617))
        make_face()
        with BuildLine():
            Line((18.8291844972, -0.0195348383), (-17.1708155028, -0.0195348383))
            Line((-17.1708155028, -0.0195348383), (-17.1708155028, -2.5195348383))
            Line((-17.1708155028, -2.5195348383), (-15.1708155028, -2.5195348383))
            Line((-15.1708155028, -2.5195348383), (-15.1708155028, -2.0195348383))
            ThreePointArc((-15.1708155028, -2.0195348383), (-15.0243688934, -1.6659814477), (-14.6708155028, -1.5195348383))
            Line((-14.6708155028, -1.5195348383), (0.8291844972, -1.5195348383))
            Line((0.8291844972, -1.5195348383), (16.3291844972, -1.5195348383))
            ThreePointArc((16.3291844972, -1.5195348383), (16.6827378878, -1.6659814477), (16.8291844972, -2.0195348383))
            Line((16.8291844972, -2.0195348383), (16.8291844972, -2.5195348383))
            Line((16.8291844972, -2.5195348383), (18.8291844972, -2.5195348383))
            Line((18.8291844972, -2.5195348383), (18.8291844972, -0.0195348383))
        make_face()
    extrude(amount=F21_DEPTH)


solid = Compound([f1.part, f7.part, f13.part, f14.part, f15.part, f18.part, f21.part])
